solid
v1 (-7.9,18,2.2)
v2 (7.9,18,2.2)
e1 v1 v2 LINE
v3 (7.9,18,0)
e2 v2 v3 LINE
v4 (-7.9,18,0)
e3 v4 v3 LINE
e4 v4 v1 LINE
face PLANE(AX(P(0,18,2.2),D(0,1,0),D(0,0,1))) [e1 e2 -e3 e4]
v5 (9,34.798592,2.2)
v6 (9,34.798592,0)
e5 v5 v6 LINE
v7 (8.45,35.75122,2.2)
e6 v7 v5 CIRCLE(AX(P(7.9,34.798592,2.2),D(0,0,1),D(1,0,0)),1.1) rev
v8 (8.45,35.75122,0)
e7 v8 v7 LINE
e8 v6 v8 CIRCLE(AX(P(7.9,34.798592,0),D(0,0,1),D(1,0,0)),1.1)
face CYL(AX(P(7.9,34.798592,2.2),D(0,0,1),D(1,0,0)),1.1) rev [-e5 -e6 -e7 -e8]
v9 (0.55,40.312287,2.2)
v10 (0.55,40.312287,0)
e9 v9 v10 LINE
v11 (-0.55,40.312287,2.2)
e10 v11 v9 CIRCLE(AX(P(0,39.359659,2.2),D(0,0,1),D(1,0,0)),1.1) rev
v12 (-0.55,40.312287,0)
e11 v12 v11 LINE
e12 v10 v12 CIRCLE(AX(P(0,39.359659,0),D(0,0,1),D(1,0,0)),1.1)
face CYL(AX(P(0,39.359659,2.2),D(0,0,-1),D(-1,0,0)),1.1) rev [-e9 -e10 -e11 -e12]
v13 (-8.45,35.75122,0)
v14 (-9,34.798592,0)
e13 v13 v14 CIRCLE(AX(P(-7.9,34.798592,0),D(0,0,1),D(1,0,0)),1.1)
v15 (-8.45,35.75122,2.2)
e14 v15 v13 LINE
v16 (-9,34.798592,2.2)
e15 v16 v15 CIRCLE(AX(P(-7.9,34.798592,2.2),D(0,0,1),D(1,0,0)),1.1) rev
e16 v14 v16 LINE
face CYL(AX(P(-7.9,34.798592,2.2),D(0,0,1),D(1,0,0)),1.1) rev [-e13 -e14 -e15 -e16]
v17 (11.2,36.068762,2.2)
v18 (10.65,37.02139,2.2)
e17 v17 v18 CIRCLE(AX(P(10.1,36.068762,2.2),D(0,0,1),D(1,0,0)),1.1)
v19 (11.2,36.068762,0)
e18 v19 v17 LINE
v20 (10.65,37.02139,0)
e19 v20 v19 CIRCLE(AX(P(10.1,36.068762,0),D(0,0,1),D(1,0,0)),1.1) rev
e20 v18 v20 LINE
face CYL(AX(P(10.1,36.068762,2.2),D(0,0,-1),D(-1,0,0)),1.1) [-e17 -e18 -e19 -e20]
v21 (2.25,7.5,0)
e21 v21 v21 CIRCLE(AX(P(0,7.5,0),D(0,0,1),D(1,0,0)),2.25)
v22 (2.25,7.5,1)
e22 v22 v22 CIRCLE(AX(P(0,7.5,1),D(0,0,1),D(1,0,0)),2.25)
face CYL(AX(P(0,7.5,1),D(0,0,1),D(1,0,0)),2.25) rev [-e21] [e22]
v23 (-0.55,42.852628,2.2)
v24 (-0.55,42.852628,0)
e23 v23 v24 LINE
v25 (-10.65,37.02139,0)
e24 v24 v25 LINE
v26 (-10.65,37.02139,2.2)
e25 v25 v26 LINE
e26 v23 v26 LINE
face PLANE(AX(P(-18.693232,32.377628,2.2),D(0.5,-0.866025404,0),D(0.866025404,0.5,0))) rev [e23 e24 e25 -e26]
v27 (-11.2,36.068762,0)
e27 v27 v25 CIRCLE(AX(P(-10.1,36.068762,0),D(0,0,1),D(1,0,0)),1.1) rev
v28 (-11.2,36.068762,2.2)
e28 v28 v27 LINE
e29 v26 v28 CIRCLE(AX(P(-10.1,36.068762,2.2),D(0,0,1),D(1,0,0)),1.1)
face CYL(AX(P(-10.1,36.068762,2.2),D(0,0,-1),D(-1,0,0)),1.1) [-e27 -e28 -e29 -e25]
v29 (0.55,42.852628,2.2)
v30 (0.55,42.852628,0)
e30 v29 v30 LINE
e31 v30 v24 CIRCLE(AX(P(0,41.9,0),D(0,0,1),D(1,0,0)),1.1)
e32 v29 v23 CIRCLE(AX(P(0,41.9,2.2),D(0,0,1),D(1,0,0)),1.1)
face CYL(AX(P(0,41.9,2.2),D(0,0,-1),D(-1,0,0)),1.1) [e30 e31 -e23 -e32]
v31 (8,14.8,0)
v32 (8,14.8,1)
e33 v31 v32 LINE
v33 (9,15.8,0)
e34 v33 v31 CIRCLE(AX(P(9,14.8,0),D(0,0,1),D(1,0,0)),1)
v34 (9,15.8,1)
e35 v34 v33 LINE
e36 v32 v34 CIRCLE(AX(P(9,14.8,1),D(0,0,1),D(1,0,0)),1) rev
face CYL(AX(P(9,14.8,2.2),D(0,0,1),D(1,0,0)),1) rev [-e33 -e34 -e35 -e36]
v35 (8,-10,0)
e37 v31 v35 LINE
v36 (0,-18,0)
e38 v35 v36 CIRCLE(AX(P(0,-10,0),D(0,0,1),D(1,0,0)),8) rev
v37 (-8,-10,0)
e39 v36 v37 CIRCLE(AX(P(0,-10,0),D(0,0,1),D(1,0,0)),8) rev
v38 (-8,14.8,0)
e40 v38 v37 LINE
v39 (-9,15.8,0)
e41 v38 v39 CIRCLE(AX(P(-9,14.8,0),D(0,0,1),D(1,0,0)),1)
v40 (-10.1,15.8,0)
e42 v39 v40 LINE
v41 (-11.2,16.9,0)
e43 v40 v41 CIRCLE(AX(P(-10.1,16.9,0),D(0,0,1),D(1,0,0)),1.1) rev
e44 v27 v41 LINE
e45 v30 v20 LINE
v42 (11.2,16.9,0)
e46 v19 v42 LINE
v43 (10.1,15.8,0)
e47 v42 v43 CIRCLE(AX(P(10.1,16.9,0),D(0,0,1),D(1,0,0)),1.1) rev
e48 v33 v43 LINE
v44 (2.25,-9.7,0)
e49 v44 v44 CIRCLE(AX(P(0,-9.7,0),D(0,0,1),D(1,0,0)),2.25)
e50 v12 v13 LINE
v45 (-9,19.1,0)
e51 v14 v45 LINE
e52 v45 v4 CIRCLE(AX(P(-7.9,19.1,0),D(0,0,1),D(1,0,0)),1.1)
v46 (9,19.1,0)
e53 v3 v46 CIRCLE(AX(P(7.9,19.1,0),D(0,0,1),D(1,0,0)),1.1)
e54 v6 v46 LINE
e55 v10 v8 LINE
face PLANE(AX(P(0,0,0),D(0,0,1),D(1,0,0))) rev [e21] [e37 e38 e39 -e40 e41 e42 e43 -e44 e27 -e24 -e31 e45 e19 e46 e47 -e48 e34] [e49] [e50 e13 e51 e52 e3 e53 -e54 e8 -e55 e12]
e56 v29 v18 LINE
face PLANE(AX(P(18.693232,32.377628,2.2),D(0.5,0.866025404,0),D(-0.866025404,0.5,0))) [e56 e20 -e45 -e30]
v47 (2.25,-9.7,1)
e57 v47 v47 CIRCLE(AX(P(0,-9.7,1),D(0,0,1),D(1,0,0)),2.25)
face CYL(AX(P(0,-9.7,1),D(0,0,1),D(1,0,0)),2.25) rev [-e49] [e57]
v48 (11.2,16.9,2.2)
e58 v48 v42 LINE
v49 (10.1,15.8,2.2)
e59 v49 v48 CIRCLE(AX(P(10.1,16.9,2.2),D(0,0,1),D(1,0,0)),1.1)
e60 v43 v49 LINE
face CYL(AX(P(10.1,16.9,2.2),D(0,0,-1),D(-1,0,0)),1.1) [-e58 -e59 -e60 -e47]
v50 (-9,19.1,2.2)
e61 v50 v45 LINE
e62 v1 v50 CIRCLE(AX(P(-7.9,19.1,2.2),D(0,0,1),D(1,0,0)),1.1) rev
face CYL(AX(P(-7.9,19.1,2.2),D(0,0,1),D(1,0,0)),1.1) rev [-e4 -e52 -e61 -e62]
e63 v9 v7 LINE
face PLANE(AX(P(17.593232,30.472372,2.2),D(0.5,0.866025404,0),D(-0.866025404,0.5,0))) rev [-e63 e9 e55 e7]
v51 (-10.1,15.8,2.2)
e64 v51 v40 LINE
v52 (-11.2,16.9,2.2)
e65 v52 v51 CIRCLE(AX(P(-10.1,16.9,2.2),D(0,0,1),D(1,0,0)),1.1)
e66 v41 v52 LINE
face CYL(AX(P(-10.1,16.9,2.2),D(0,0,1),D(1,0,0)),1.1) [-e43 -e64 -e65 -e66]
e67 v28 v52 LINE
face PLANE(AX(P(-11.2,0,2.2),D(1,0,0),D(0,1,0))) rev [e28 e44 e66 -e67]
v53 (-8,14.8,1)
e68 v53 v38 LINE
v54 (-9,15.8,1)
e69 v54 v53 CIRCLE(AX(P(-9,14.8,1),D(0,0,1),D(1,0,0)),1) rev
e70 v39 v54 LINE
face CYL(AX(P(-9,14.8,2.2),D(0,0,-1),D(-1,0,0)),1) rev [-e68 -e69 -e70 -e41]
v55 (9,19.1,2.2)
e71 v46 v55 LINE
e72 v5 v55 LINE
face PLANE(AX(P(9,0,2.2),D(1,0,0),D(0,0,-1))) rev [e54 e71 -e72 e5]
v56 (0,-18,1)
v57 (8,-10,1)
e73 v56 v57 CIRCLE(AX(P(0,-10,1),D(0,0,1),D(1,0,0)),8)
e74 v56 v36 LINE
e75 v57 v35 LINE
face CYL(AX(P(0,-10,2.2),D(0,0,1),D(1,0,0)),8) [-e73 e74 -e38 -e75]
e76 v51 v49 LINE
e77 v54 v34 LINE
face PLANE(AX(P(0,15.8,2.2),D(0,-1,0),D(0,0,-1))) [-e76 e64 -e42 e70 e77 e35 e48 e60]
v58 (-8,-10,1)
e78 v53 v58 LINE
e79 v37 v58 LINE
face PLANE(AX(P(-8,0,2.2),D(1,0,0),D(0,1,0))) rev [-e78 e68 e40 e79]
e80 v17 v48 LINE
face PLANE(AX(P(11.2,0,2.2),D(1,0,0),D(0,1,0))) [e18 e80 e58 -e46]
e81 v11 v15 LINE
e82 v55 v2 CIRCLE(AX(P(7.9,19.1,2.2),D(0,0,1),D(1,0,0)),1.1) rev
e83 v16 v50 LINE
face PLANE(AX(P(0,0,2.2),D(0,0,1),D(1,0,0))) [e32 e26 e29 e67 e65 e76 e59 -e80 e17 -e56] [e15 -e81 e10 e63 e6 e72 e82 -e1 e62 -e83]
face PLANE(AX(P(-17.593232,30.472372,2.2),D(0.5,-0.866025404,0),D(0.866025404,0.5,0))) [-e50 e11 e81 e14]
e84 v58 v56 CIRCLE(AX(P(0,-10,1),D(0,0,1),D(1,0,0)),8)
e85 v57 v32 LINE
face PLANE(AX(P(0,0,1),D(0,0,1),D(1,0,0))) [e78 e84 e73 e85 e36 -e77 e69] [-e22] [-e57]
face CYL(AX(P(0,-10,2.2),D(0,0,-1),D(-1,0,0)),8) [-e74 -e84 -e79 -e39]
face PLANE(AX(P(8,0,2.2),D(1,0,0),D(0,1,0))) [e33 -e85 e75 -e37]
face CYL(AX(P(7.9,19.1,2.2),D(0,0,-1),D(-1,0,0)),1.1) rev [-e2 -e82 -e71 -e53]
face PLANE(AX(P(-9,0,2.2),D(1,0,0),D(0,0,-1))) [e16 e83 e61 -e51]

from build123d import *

# Parameters (mm, degrees)
EXTRUDE_1_DEPTH     = 2.2
SKETCH_4_W          = 16
SKETCH_4_H          = 33.8
CUT_EXTRUDE_1_DEPTH = 1.2
F_2_0MM_1_D         = 4.5
FILLET_1_R          = 1.1
FILLET_2_R          = 8
FILLET_3_R          = 1


with BuildPart() as part:
    # 草圖2 → 填料-伸長1 (new body)
    with BuildSketch(Plane.XY):
        with BuildLine():
            Line((8, -18), (8, 15.8))
            Line((8, 15.8), (11.2, 15.8))
            Line((11.2, 15.8), (11.2, 36.703847577))
            Line((11.2, 36.703847577), (0.55, 42.852627944))
            ThreePointArc((0.55, 42.852627944), (0, 43), (-0.55, 42.852627944))
            Line((-0.55, 42.852627944), (-11.2, 36.703847577))
            Line((-11.2, 36.703847577), (-11.2, 15.8))
            Line((-11.2, 15.8), (-8, 15.8))
            Line((-8, 15.8), (-8, -18))
            Line((-8, -18), (8, -18))
        make_face()
        Polygon((8, 18), (-8, 18), (-9, 18), (-9, 35.433676985), (0, 40.629829408), (9, 35.433676985), (9, 18), align=None, mode=Mode.SUBTRACT)
    extrude(amount=EXTRUDE_1_DEPTH)

    # 草圖4 → 除料-伸長1 (cut)
    with BuildSketch(Plane.XY.offset(2.2)):
        with Locations((0, -1.1)):
            Rectangle(SKETCH_4_W, SKETCH_4_H)
    extrude(amount=-CUT_EXTRUDE_1_DEPTH, mode=Mode.SUBTRACT)

    # Ø2.0mm 定位孔1 (through all)
    with Locations(Plane(origin=(0, 7.5, 1), x_dir=(1, 0, 0), z_dir=(0, 0, 1))):
        with Locations((0, 0), (0, -17.2)):
            Hole(F_2_0MM_1_D / 2)

    # 圓角1
    fillet_1_edges = [part.edges().sort_by_distance(p)[0] for p in [
        (9, 35.433676985, 1.1),
        (0, 40.629829408, 1.1),
        (-9, 35.433676985, 1.1),
        (-9, 18, 1.1),
        (9, 18, 1.1),
        (-11.2, 15.8, 1.1),
        (-11.2, 36.703847577, 1.1),
        (11.2, 36.703847577, 1.1),
        (11.2, 15.8, 1.1),
    ]]
    fillet(fillet_1_edges, radius=FILLET_1_R)

    # 圓角2
    fillet_2_edges = [part.edges().sort_by_distance(p)[0] for p in [
        (8, -18, 0.5),
        (-8, -18, 0.5),
    ]]
    fillet(fillet_2_edges, radius=FILLET_2_R - 0.0001)  # a hair under: the kernel refuses the full size

    # 圓角3
    fillet_3_edges = [part.edges().sort_by_distance(p)[0] for p in [
        (-8, 15.8, 0.5),
        (8, 15.8, 0.5),
    ]]
    fillet(fillet_3_edges, radius=FILLET_3_R)


solid = part.part
